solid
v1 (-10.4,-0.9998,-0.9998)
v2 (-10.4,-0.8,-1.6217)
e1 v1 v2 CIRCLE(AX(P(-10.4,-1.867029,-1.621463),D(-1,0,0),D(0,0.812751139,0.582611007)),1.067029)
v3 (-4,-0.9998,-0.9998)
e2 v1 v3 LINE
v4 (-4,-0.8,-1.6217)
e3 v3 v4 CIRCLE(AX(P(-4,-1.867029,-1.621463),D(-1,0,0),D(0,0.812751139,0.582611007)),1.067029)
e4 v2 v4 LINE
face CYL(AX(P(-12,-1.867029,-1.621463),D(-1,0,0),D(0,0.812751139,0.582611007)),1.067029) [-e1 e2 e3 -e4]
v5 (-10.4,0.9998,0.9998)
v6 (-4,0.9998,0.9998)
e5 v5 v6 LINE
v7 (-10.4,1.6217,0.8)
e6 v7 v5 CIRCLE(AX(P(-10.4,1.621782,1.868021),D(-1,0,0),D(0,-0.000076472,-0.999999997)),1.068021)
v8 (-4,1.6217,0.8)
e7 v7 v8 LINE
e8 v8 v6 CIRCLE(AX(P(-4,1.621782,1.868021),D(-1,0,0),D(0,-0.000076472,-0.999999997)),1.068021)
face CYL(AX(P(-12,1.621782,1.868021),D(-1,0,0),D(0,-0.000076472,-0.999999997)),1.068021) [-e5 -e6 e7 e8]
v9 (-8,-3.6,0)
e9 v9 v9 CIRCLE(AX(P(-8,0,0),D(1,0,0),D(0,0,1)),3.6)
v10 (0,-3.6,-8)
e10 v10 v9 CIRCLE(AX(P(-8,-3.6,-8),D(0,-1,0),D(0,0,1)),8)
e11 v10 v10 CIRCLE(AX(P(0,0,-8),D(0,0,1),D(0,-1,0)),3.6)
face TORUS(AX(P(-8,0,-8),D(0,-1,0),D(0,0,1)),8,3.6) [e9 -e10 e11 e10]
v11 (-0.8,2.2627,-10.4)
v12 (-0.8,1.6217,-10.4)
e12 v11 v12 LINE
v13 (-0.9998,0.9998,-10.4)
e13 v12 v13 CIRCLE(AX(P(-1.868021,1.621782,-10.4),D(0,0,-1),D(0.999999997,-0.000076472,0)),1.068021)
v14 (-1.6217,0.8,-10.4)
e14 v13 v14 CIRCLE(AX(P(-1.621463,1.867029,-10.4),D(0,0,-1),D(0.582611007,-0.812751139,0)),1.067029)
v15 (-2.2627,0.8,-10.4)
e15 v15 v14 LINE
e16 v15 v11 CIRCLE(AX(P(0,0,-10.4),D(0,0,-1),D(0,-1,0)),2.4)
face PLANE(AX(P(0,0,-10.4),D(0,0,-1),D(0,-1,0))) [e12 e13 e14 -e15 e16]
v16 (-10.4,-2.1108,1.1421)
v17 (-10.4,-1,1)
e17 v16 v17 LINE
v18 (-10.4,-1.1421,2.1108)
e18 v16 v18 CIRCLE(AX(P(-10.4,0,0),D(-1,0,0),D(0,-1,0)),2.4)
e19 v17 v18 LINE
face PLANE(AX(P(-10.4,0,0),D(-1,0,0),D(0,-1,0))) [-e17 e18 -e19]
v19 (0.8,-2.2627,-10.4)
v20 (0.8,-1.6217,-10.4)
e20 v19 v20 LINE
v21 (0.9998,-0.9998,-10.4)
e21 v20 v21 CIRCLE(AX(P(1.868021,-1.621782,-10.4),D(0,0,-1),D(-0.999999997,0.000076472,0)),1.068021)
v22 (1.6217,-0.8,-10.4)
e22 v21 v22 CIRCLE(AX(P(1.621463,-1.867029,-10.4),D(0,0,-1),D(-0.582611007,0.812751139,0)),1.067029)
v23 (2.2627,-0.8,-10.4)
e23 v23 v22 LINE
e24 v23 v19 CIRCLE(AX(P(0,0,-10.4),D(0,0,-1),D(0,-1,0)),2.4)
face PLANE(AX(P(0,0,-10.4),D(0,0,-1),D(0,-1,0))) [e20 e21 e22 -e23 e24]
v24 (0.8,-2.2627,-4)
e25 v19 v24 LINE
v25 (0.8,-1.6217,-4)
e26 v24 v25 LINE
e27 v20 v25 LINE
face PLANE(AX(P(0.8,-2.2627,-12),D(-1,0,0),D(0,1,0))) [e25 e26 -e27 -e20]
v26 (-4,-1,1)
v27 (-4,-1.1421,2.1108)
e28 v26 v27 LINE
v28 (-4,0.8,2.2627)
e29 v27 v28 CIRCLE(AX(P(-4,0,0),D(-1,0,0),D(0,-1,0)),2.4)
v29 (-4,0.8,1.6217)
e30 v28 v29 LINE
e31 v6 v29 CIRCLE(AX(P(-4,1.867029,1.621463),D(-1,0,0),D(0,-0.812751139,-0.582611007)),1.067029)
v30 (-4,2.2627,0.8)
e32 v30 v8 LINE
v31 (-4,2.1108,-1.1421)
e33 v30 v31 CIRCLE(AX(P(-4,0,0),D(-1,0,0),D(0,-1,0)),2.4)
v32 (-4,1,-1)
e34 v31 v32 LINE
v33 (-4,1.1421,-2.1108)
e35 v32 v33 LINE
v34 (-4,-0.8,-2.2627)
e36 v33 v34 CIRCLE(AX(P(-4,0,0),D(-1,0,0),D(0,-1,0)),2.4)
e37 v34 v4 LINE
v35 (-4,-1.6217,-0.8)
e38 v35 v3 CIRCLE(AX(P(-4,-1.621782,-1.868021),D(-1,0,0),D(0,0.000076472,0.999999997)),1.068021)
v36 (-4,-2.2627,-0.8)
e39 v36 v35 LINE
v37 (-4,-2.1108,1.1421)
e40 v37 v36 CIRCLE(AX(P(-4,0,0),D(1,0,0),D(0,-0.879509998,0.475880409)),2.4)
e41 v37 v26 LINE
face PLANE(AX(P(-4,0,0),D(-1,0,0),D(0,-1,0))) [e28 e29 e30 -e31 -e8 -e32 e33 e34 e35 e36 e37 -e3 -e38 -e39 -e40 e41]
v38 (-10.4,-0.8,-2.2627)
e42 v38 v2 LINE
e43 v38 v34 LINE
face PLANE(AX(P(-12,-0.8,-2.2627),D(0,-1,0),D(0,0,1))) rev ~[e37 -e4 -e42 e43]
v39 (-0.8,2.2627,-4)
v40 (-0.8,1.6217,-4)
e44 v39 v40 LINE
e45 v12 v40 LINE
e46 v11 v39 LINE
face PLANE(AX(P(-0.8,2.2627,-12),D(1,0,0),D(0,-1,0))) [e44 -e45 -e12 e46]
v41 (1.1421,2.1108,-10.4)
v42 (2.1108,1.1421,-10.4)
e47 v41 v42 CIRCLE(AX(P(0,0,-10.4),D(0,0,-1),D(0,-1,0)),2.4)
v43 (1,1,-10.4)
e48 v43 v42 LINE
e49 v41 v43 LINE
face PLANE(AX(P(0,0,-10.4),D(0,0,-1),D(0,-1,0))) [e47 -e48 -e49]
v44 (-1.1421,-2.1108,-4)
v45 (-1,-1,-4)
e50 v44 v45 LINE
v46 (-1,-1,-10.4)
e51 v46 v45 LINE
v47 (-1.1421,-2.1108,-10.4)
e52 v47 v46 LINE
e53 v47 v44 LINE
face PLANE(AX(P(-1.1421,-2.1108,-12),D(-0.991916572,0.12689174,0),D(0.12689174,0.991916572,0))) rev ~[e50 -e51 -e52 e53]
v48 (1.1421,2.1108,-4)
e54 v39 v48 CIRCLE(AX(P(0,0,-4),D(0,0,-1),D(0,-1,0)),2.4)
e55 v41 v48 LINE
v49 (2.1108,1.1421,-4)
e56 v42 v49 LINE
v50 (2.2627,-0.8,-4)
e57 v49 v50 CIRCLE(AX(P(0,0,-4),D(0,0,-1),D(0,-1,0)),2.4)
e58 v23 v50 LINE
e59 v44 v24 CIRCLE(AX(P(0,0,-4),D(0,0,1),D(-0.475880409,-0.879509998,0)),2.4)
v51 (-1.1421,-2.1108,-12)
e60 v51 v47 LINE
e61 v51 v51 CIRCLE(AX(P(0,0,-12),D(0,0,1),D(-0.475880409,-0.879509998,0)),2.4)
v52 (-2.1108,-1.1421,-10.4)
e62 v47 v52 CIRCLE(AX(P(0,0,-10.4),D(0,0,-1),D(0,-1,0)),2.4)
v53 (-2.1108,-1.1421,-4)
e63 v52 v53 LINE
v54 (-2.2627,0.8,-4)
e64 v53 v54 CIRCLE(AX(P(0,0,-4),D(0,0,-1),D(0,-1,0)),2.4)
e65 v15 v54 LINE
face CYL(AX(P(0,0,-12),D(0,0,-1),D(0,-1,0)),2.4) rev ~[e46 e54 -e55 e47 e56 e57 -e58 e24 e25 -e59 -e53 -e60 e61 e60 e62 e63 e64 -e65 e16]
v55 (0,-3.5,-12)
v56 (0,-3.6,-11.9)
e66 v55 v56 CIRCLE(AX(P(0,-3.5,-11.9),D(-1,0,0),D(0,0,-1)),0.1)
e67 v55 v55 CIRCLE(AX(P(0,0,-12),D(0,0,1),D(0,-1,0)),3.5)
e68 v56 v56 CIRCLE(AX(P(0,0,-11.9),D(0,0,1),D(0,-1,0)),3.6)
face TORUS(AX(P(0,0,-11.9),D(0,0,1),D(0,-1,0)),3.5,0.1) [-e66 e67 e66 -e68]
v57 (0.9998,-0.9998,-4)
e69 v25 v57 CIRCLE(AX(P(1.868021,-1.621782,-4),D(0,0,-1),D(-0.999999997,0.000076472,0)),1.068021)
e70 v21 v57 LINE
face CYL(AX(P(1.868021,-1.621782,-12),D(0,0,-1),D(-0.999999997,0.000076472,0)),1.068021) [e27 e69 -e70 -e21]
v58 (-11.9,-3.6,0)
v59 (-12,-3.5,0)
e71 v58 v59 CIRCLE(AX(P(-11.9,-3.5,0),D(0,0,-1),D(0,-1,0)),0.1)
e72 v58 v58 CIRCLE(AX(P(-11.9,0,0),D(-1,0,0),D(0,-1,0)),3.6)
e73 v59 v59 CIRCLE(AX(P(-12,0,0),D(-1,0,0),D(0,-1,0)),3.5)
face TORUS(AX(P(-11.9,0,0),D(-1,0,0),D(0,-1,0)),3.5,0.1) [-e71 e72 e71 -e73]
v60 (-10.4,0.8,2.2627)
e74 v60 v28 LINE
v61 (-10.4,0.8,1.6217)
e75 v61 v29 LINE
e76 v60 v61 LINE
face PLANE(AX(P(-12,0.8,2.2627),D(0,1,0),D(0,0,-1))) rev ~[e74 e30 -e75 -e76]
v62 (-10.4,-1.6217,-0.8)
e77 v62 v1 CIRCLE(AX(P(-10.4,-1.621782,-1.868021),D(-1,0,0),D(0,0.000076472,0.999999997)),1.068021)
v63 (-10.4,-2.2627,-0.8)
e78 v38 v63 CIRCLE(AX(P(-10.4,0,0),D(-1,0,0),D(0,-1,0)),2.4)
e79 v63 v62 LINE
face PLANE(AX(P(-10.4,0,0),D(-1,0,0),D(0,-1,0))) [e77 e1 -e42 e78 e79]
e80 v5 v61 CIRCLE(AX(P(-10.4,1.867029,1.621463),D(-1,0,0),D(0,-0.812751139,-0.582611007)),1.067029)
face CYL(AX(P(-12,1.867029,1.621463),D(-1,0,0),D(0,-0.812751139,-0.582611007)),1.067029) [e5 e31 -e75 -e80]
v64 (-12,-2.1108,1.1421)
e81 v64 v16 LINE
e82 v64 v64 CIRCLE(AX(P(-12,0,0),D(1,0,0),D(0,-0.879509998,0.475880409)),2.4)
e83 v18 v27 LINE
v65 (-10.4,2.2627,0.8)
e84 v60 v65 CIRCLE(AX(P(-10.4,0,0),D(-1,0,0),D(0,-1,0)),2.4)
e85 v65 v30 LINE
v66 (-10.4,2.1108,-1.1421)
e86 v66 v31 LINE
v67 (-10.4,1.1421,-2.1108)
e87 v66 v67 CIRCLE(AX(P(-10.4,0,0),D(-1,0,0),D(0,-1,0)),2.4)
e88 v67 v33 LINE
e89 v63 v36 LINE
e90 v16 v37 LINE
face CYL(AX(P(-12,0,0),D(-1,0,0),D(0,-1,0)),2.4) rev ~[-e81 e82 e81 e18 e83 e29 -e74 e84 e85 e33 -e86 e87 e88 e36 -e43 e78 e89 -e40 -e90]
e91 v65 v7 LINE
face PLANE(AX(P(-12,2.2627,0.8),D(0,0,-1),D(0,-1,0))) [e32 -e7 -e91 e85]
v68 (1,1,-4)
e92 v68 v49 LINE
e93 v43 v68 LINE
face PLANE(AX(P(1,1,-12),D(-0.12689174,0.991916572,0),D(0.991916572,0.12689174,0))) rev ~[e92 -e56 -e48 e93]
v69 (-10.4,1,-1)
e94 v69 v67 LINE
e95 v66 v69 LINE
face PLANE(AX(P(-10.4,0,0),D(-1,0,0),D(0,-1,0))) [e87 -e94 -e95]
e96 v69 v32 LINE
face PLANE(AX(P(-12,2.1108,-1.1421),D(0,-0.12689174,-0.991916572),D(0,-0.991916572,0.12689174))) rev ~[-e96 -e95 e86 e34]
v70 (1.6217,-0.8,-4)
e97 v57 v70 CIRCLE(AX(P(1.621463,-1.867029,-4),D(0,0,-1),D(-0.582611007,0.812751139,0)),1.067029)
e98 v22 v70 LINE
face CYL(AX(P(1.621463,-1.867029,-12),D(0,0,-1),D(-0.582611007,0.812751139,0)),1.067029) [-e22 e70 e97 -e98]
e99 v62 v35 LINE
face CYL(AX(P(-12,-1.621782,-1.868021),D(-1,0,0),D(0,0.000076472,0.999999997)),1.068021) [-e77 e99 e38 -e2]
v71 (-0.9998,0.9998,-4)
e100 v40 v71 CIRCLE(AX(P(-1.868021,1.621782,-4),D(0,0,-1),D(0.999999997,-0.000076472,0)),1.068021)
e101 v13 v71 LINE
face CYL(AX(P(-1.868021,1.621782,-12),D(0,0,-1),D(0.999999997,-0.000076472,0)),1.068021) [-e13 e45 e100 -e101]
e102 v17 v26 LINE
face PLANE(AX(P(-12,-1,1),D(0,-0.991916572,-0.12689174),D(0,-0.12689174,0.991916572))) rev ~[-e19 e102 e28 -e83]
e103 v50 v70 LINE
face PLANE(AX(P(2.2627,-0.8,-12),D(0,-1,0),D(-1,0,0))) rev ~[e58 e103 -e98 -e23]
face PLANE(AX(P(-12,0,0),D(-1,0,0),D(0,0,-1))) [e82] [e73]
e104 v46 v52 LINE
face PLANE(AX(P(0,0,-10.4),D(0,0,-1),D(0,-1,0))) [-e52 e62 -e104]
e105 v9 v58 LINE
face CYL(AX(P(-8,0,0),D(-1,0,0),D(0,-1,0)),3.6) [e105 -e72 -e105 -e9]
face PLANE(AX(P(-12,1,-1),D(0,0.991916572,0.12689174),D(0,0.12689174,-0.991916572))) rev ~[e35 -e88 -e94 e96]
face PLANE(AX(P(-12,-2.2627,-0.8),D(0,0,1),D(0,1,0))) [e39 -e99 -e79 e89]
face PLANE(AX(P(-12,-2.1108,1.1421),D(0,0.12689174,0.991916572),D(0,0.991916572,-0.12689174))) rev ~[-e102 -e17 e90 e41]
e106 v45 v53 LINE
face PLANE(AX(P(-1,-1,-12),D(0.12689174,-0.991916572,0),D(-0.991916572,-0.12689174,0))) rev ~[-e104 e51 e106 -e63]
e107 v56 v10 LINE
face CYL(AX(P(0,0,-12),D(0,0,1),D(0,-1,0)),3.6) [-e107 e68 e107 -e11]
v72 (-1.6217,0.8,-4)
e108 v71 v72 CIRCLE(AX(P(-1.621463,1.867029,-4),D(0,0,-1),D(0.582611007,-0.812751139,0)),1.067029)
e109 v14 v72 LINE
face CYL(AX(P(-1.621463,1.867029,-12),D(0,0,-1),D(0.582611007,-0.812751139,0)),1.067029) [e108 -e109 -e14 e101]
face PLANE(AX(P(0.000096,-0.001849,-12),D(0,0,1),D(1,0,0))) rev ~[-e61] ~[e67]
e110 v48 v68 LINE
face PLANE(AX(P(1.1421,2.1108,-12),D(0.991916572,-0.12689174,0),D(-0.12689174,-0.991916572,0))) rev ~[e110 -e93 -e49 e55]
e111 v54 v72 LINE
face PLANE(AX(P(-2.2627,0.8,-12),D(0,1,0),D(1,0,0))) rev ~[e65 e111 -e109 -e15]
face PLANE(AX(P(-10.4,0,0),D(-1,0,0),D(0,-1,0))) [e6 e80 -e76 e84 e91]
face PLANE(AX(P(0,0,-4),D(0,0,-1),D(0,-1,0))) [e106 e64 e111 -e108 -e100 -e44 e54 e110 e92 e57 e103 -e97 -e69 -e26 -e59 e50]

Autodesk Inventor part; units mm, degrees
ref_plane "YZ Plane" through (0, 0, 0) normal (1, 0, 0) x (0, 1, 0)
ref_plane "XZ Plane" through (0, 0, 0) normal (0, 1, 0) x (-1, 0, 0)
sketch "Sketch2" plane through (0, 0, 0) normal (0, 1, 0) x (-1, 0, 0)
  line L0 (0, -12) -> (0, -8)
  arc A0 (8, 0) -> (0, -8) centre (8, -8) ccw
  line L1 (8, 0) -> (12, 0)
  point P0 (0, 0)
  dimension "d0" = 4
  dimension "d1" = 8
ref_plane "Work Plane1" through (-12, 0, 0) normal (-1, 0, 0) x (0, -1, 0)
sketch "Sketch3" plane through (-12, 0, 0) normal (-1, 0, 0) x (0, -1, 0)
  circle A0 centre (0, 0) radius 3.6
  circle A1 centre (0, 0) radius 2.4
  line L0 (-2.2627, 0.8) -> (-1.6217, 0.8)
  arc A2 (-1.6217, 0.8) -> (-0.9998, 0.9998) centre (-1.6217, 1.8675) ccw
  line L1 (-0.8, 2.2627) -> (-0.8, 1.6217)
  arc A3 (-0.9998, 0.9998) -> (-0.8, 1.6217) centre (-1.8675, 1.6217) ccw
  line L2 (2.2627, -0.8) -> (1.6217, -0.8)
  arc A4 (1.6217, -0.8) -> (0.9998, -0.9998) centre (1.6217, -1.8675) ccw
  line L3 (0.8, -2.2627) -> (0.8, -1.6217)
  arc A5 (0.9998, -0.9998) -> (0.8, -1.6217) centre (1.8675, -1.6217) ccw
  line L4 (0.9998, -0.9998) -> (-0.9998, 0.9998) construction
  line L5 (-2.1108, -1.1421) -> (-1, -1)
  line L6 (-1, -1) -> (-1.1421, -2.1108)
  line L7 (2.1108, 1.1421) -> (1, 1)
  line L8 (1, 1) -> (1.1421, 2.1108)
  line L9 (-1, -1) -> (1, 1) construction
  point P0 (0, 0)
  dimension "d3" = 4.8
  dimension "d2" = 7.2
  dimension "d4" = 45
  dimension "d5" = 1.6
  dimension "d6" = 0.641
  dimension "d7" = 2.828
  dimension "d8" = 2
  dimension "d9" = 1.37
sweep "Sweep1" add profiles "Sketch3" path "Sketch2" contours A0 | A1 L2 A4 A5 L3 L6 L5 L0 A2 A3 L1 L8 L7 | L7 L8 A1 | A1 L3 A5 A4 L2 | L1 A3 A2 L0 A1 | A1 L5 L6
extrude "Extrusion1" cut sketch "Sketch3" against normal blind 8 contours A1 L2 A4 A5 L3 L6 L5 L0 A2 A3 L1 L8 L7
extrude "Extrusion2" cut sketch "Sketch3" against normal blind 1.6 contours L7 L8 A1 | A1 L3 A5 A4 L2 | L1 A3 A2 L0 A1 | A1 L5 L6
pattern_circular "Circular Pattern1" count 2 over 90 about axis through (0, -10, 0) along (0, -1, 0) of "Extrusion1", "Extrusion2"
fillet "Fillet1" radius 0.1 2 edges at (-12, 3.6, 0) (0, 3.6, -12)
equation "\"d0\" = 0.5 * lu"
equation "\"d1\" = lu"
equation "\"d3\" = kd"
equation "\"d2\" = tlad"
equation "\"d5\" = axlet"
equation "\"d12\" = lu"
equation "\"d14\" = wall"
equation "\"d19\" = lf"
equation "\"lu\" = 8"
equation "\"kd\" = 4.8"
equation "\"tlad\" = 7.2"
equation "\"axlet\" = 1.6"
equation "\"wall\" = 1.6"
equation "\"lf\" = 0.1"
properties part number "25214-LtBluishGray" material "ABS Plastic"
